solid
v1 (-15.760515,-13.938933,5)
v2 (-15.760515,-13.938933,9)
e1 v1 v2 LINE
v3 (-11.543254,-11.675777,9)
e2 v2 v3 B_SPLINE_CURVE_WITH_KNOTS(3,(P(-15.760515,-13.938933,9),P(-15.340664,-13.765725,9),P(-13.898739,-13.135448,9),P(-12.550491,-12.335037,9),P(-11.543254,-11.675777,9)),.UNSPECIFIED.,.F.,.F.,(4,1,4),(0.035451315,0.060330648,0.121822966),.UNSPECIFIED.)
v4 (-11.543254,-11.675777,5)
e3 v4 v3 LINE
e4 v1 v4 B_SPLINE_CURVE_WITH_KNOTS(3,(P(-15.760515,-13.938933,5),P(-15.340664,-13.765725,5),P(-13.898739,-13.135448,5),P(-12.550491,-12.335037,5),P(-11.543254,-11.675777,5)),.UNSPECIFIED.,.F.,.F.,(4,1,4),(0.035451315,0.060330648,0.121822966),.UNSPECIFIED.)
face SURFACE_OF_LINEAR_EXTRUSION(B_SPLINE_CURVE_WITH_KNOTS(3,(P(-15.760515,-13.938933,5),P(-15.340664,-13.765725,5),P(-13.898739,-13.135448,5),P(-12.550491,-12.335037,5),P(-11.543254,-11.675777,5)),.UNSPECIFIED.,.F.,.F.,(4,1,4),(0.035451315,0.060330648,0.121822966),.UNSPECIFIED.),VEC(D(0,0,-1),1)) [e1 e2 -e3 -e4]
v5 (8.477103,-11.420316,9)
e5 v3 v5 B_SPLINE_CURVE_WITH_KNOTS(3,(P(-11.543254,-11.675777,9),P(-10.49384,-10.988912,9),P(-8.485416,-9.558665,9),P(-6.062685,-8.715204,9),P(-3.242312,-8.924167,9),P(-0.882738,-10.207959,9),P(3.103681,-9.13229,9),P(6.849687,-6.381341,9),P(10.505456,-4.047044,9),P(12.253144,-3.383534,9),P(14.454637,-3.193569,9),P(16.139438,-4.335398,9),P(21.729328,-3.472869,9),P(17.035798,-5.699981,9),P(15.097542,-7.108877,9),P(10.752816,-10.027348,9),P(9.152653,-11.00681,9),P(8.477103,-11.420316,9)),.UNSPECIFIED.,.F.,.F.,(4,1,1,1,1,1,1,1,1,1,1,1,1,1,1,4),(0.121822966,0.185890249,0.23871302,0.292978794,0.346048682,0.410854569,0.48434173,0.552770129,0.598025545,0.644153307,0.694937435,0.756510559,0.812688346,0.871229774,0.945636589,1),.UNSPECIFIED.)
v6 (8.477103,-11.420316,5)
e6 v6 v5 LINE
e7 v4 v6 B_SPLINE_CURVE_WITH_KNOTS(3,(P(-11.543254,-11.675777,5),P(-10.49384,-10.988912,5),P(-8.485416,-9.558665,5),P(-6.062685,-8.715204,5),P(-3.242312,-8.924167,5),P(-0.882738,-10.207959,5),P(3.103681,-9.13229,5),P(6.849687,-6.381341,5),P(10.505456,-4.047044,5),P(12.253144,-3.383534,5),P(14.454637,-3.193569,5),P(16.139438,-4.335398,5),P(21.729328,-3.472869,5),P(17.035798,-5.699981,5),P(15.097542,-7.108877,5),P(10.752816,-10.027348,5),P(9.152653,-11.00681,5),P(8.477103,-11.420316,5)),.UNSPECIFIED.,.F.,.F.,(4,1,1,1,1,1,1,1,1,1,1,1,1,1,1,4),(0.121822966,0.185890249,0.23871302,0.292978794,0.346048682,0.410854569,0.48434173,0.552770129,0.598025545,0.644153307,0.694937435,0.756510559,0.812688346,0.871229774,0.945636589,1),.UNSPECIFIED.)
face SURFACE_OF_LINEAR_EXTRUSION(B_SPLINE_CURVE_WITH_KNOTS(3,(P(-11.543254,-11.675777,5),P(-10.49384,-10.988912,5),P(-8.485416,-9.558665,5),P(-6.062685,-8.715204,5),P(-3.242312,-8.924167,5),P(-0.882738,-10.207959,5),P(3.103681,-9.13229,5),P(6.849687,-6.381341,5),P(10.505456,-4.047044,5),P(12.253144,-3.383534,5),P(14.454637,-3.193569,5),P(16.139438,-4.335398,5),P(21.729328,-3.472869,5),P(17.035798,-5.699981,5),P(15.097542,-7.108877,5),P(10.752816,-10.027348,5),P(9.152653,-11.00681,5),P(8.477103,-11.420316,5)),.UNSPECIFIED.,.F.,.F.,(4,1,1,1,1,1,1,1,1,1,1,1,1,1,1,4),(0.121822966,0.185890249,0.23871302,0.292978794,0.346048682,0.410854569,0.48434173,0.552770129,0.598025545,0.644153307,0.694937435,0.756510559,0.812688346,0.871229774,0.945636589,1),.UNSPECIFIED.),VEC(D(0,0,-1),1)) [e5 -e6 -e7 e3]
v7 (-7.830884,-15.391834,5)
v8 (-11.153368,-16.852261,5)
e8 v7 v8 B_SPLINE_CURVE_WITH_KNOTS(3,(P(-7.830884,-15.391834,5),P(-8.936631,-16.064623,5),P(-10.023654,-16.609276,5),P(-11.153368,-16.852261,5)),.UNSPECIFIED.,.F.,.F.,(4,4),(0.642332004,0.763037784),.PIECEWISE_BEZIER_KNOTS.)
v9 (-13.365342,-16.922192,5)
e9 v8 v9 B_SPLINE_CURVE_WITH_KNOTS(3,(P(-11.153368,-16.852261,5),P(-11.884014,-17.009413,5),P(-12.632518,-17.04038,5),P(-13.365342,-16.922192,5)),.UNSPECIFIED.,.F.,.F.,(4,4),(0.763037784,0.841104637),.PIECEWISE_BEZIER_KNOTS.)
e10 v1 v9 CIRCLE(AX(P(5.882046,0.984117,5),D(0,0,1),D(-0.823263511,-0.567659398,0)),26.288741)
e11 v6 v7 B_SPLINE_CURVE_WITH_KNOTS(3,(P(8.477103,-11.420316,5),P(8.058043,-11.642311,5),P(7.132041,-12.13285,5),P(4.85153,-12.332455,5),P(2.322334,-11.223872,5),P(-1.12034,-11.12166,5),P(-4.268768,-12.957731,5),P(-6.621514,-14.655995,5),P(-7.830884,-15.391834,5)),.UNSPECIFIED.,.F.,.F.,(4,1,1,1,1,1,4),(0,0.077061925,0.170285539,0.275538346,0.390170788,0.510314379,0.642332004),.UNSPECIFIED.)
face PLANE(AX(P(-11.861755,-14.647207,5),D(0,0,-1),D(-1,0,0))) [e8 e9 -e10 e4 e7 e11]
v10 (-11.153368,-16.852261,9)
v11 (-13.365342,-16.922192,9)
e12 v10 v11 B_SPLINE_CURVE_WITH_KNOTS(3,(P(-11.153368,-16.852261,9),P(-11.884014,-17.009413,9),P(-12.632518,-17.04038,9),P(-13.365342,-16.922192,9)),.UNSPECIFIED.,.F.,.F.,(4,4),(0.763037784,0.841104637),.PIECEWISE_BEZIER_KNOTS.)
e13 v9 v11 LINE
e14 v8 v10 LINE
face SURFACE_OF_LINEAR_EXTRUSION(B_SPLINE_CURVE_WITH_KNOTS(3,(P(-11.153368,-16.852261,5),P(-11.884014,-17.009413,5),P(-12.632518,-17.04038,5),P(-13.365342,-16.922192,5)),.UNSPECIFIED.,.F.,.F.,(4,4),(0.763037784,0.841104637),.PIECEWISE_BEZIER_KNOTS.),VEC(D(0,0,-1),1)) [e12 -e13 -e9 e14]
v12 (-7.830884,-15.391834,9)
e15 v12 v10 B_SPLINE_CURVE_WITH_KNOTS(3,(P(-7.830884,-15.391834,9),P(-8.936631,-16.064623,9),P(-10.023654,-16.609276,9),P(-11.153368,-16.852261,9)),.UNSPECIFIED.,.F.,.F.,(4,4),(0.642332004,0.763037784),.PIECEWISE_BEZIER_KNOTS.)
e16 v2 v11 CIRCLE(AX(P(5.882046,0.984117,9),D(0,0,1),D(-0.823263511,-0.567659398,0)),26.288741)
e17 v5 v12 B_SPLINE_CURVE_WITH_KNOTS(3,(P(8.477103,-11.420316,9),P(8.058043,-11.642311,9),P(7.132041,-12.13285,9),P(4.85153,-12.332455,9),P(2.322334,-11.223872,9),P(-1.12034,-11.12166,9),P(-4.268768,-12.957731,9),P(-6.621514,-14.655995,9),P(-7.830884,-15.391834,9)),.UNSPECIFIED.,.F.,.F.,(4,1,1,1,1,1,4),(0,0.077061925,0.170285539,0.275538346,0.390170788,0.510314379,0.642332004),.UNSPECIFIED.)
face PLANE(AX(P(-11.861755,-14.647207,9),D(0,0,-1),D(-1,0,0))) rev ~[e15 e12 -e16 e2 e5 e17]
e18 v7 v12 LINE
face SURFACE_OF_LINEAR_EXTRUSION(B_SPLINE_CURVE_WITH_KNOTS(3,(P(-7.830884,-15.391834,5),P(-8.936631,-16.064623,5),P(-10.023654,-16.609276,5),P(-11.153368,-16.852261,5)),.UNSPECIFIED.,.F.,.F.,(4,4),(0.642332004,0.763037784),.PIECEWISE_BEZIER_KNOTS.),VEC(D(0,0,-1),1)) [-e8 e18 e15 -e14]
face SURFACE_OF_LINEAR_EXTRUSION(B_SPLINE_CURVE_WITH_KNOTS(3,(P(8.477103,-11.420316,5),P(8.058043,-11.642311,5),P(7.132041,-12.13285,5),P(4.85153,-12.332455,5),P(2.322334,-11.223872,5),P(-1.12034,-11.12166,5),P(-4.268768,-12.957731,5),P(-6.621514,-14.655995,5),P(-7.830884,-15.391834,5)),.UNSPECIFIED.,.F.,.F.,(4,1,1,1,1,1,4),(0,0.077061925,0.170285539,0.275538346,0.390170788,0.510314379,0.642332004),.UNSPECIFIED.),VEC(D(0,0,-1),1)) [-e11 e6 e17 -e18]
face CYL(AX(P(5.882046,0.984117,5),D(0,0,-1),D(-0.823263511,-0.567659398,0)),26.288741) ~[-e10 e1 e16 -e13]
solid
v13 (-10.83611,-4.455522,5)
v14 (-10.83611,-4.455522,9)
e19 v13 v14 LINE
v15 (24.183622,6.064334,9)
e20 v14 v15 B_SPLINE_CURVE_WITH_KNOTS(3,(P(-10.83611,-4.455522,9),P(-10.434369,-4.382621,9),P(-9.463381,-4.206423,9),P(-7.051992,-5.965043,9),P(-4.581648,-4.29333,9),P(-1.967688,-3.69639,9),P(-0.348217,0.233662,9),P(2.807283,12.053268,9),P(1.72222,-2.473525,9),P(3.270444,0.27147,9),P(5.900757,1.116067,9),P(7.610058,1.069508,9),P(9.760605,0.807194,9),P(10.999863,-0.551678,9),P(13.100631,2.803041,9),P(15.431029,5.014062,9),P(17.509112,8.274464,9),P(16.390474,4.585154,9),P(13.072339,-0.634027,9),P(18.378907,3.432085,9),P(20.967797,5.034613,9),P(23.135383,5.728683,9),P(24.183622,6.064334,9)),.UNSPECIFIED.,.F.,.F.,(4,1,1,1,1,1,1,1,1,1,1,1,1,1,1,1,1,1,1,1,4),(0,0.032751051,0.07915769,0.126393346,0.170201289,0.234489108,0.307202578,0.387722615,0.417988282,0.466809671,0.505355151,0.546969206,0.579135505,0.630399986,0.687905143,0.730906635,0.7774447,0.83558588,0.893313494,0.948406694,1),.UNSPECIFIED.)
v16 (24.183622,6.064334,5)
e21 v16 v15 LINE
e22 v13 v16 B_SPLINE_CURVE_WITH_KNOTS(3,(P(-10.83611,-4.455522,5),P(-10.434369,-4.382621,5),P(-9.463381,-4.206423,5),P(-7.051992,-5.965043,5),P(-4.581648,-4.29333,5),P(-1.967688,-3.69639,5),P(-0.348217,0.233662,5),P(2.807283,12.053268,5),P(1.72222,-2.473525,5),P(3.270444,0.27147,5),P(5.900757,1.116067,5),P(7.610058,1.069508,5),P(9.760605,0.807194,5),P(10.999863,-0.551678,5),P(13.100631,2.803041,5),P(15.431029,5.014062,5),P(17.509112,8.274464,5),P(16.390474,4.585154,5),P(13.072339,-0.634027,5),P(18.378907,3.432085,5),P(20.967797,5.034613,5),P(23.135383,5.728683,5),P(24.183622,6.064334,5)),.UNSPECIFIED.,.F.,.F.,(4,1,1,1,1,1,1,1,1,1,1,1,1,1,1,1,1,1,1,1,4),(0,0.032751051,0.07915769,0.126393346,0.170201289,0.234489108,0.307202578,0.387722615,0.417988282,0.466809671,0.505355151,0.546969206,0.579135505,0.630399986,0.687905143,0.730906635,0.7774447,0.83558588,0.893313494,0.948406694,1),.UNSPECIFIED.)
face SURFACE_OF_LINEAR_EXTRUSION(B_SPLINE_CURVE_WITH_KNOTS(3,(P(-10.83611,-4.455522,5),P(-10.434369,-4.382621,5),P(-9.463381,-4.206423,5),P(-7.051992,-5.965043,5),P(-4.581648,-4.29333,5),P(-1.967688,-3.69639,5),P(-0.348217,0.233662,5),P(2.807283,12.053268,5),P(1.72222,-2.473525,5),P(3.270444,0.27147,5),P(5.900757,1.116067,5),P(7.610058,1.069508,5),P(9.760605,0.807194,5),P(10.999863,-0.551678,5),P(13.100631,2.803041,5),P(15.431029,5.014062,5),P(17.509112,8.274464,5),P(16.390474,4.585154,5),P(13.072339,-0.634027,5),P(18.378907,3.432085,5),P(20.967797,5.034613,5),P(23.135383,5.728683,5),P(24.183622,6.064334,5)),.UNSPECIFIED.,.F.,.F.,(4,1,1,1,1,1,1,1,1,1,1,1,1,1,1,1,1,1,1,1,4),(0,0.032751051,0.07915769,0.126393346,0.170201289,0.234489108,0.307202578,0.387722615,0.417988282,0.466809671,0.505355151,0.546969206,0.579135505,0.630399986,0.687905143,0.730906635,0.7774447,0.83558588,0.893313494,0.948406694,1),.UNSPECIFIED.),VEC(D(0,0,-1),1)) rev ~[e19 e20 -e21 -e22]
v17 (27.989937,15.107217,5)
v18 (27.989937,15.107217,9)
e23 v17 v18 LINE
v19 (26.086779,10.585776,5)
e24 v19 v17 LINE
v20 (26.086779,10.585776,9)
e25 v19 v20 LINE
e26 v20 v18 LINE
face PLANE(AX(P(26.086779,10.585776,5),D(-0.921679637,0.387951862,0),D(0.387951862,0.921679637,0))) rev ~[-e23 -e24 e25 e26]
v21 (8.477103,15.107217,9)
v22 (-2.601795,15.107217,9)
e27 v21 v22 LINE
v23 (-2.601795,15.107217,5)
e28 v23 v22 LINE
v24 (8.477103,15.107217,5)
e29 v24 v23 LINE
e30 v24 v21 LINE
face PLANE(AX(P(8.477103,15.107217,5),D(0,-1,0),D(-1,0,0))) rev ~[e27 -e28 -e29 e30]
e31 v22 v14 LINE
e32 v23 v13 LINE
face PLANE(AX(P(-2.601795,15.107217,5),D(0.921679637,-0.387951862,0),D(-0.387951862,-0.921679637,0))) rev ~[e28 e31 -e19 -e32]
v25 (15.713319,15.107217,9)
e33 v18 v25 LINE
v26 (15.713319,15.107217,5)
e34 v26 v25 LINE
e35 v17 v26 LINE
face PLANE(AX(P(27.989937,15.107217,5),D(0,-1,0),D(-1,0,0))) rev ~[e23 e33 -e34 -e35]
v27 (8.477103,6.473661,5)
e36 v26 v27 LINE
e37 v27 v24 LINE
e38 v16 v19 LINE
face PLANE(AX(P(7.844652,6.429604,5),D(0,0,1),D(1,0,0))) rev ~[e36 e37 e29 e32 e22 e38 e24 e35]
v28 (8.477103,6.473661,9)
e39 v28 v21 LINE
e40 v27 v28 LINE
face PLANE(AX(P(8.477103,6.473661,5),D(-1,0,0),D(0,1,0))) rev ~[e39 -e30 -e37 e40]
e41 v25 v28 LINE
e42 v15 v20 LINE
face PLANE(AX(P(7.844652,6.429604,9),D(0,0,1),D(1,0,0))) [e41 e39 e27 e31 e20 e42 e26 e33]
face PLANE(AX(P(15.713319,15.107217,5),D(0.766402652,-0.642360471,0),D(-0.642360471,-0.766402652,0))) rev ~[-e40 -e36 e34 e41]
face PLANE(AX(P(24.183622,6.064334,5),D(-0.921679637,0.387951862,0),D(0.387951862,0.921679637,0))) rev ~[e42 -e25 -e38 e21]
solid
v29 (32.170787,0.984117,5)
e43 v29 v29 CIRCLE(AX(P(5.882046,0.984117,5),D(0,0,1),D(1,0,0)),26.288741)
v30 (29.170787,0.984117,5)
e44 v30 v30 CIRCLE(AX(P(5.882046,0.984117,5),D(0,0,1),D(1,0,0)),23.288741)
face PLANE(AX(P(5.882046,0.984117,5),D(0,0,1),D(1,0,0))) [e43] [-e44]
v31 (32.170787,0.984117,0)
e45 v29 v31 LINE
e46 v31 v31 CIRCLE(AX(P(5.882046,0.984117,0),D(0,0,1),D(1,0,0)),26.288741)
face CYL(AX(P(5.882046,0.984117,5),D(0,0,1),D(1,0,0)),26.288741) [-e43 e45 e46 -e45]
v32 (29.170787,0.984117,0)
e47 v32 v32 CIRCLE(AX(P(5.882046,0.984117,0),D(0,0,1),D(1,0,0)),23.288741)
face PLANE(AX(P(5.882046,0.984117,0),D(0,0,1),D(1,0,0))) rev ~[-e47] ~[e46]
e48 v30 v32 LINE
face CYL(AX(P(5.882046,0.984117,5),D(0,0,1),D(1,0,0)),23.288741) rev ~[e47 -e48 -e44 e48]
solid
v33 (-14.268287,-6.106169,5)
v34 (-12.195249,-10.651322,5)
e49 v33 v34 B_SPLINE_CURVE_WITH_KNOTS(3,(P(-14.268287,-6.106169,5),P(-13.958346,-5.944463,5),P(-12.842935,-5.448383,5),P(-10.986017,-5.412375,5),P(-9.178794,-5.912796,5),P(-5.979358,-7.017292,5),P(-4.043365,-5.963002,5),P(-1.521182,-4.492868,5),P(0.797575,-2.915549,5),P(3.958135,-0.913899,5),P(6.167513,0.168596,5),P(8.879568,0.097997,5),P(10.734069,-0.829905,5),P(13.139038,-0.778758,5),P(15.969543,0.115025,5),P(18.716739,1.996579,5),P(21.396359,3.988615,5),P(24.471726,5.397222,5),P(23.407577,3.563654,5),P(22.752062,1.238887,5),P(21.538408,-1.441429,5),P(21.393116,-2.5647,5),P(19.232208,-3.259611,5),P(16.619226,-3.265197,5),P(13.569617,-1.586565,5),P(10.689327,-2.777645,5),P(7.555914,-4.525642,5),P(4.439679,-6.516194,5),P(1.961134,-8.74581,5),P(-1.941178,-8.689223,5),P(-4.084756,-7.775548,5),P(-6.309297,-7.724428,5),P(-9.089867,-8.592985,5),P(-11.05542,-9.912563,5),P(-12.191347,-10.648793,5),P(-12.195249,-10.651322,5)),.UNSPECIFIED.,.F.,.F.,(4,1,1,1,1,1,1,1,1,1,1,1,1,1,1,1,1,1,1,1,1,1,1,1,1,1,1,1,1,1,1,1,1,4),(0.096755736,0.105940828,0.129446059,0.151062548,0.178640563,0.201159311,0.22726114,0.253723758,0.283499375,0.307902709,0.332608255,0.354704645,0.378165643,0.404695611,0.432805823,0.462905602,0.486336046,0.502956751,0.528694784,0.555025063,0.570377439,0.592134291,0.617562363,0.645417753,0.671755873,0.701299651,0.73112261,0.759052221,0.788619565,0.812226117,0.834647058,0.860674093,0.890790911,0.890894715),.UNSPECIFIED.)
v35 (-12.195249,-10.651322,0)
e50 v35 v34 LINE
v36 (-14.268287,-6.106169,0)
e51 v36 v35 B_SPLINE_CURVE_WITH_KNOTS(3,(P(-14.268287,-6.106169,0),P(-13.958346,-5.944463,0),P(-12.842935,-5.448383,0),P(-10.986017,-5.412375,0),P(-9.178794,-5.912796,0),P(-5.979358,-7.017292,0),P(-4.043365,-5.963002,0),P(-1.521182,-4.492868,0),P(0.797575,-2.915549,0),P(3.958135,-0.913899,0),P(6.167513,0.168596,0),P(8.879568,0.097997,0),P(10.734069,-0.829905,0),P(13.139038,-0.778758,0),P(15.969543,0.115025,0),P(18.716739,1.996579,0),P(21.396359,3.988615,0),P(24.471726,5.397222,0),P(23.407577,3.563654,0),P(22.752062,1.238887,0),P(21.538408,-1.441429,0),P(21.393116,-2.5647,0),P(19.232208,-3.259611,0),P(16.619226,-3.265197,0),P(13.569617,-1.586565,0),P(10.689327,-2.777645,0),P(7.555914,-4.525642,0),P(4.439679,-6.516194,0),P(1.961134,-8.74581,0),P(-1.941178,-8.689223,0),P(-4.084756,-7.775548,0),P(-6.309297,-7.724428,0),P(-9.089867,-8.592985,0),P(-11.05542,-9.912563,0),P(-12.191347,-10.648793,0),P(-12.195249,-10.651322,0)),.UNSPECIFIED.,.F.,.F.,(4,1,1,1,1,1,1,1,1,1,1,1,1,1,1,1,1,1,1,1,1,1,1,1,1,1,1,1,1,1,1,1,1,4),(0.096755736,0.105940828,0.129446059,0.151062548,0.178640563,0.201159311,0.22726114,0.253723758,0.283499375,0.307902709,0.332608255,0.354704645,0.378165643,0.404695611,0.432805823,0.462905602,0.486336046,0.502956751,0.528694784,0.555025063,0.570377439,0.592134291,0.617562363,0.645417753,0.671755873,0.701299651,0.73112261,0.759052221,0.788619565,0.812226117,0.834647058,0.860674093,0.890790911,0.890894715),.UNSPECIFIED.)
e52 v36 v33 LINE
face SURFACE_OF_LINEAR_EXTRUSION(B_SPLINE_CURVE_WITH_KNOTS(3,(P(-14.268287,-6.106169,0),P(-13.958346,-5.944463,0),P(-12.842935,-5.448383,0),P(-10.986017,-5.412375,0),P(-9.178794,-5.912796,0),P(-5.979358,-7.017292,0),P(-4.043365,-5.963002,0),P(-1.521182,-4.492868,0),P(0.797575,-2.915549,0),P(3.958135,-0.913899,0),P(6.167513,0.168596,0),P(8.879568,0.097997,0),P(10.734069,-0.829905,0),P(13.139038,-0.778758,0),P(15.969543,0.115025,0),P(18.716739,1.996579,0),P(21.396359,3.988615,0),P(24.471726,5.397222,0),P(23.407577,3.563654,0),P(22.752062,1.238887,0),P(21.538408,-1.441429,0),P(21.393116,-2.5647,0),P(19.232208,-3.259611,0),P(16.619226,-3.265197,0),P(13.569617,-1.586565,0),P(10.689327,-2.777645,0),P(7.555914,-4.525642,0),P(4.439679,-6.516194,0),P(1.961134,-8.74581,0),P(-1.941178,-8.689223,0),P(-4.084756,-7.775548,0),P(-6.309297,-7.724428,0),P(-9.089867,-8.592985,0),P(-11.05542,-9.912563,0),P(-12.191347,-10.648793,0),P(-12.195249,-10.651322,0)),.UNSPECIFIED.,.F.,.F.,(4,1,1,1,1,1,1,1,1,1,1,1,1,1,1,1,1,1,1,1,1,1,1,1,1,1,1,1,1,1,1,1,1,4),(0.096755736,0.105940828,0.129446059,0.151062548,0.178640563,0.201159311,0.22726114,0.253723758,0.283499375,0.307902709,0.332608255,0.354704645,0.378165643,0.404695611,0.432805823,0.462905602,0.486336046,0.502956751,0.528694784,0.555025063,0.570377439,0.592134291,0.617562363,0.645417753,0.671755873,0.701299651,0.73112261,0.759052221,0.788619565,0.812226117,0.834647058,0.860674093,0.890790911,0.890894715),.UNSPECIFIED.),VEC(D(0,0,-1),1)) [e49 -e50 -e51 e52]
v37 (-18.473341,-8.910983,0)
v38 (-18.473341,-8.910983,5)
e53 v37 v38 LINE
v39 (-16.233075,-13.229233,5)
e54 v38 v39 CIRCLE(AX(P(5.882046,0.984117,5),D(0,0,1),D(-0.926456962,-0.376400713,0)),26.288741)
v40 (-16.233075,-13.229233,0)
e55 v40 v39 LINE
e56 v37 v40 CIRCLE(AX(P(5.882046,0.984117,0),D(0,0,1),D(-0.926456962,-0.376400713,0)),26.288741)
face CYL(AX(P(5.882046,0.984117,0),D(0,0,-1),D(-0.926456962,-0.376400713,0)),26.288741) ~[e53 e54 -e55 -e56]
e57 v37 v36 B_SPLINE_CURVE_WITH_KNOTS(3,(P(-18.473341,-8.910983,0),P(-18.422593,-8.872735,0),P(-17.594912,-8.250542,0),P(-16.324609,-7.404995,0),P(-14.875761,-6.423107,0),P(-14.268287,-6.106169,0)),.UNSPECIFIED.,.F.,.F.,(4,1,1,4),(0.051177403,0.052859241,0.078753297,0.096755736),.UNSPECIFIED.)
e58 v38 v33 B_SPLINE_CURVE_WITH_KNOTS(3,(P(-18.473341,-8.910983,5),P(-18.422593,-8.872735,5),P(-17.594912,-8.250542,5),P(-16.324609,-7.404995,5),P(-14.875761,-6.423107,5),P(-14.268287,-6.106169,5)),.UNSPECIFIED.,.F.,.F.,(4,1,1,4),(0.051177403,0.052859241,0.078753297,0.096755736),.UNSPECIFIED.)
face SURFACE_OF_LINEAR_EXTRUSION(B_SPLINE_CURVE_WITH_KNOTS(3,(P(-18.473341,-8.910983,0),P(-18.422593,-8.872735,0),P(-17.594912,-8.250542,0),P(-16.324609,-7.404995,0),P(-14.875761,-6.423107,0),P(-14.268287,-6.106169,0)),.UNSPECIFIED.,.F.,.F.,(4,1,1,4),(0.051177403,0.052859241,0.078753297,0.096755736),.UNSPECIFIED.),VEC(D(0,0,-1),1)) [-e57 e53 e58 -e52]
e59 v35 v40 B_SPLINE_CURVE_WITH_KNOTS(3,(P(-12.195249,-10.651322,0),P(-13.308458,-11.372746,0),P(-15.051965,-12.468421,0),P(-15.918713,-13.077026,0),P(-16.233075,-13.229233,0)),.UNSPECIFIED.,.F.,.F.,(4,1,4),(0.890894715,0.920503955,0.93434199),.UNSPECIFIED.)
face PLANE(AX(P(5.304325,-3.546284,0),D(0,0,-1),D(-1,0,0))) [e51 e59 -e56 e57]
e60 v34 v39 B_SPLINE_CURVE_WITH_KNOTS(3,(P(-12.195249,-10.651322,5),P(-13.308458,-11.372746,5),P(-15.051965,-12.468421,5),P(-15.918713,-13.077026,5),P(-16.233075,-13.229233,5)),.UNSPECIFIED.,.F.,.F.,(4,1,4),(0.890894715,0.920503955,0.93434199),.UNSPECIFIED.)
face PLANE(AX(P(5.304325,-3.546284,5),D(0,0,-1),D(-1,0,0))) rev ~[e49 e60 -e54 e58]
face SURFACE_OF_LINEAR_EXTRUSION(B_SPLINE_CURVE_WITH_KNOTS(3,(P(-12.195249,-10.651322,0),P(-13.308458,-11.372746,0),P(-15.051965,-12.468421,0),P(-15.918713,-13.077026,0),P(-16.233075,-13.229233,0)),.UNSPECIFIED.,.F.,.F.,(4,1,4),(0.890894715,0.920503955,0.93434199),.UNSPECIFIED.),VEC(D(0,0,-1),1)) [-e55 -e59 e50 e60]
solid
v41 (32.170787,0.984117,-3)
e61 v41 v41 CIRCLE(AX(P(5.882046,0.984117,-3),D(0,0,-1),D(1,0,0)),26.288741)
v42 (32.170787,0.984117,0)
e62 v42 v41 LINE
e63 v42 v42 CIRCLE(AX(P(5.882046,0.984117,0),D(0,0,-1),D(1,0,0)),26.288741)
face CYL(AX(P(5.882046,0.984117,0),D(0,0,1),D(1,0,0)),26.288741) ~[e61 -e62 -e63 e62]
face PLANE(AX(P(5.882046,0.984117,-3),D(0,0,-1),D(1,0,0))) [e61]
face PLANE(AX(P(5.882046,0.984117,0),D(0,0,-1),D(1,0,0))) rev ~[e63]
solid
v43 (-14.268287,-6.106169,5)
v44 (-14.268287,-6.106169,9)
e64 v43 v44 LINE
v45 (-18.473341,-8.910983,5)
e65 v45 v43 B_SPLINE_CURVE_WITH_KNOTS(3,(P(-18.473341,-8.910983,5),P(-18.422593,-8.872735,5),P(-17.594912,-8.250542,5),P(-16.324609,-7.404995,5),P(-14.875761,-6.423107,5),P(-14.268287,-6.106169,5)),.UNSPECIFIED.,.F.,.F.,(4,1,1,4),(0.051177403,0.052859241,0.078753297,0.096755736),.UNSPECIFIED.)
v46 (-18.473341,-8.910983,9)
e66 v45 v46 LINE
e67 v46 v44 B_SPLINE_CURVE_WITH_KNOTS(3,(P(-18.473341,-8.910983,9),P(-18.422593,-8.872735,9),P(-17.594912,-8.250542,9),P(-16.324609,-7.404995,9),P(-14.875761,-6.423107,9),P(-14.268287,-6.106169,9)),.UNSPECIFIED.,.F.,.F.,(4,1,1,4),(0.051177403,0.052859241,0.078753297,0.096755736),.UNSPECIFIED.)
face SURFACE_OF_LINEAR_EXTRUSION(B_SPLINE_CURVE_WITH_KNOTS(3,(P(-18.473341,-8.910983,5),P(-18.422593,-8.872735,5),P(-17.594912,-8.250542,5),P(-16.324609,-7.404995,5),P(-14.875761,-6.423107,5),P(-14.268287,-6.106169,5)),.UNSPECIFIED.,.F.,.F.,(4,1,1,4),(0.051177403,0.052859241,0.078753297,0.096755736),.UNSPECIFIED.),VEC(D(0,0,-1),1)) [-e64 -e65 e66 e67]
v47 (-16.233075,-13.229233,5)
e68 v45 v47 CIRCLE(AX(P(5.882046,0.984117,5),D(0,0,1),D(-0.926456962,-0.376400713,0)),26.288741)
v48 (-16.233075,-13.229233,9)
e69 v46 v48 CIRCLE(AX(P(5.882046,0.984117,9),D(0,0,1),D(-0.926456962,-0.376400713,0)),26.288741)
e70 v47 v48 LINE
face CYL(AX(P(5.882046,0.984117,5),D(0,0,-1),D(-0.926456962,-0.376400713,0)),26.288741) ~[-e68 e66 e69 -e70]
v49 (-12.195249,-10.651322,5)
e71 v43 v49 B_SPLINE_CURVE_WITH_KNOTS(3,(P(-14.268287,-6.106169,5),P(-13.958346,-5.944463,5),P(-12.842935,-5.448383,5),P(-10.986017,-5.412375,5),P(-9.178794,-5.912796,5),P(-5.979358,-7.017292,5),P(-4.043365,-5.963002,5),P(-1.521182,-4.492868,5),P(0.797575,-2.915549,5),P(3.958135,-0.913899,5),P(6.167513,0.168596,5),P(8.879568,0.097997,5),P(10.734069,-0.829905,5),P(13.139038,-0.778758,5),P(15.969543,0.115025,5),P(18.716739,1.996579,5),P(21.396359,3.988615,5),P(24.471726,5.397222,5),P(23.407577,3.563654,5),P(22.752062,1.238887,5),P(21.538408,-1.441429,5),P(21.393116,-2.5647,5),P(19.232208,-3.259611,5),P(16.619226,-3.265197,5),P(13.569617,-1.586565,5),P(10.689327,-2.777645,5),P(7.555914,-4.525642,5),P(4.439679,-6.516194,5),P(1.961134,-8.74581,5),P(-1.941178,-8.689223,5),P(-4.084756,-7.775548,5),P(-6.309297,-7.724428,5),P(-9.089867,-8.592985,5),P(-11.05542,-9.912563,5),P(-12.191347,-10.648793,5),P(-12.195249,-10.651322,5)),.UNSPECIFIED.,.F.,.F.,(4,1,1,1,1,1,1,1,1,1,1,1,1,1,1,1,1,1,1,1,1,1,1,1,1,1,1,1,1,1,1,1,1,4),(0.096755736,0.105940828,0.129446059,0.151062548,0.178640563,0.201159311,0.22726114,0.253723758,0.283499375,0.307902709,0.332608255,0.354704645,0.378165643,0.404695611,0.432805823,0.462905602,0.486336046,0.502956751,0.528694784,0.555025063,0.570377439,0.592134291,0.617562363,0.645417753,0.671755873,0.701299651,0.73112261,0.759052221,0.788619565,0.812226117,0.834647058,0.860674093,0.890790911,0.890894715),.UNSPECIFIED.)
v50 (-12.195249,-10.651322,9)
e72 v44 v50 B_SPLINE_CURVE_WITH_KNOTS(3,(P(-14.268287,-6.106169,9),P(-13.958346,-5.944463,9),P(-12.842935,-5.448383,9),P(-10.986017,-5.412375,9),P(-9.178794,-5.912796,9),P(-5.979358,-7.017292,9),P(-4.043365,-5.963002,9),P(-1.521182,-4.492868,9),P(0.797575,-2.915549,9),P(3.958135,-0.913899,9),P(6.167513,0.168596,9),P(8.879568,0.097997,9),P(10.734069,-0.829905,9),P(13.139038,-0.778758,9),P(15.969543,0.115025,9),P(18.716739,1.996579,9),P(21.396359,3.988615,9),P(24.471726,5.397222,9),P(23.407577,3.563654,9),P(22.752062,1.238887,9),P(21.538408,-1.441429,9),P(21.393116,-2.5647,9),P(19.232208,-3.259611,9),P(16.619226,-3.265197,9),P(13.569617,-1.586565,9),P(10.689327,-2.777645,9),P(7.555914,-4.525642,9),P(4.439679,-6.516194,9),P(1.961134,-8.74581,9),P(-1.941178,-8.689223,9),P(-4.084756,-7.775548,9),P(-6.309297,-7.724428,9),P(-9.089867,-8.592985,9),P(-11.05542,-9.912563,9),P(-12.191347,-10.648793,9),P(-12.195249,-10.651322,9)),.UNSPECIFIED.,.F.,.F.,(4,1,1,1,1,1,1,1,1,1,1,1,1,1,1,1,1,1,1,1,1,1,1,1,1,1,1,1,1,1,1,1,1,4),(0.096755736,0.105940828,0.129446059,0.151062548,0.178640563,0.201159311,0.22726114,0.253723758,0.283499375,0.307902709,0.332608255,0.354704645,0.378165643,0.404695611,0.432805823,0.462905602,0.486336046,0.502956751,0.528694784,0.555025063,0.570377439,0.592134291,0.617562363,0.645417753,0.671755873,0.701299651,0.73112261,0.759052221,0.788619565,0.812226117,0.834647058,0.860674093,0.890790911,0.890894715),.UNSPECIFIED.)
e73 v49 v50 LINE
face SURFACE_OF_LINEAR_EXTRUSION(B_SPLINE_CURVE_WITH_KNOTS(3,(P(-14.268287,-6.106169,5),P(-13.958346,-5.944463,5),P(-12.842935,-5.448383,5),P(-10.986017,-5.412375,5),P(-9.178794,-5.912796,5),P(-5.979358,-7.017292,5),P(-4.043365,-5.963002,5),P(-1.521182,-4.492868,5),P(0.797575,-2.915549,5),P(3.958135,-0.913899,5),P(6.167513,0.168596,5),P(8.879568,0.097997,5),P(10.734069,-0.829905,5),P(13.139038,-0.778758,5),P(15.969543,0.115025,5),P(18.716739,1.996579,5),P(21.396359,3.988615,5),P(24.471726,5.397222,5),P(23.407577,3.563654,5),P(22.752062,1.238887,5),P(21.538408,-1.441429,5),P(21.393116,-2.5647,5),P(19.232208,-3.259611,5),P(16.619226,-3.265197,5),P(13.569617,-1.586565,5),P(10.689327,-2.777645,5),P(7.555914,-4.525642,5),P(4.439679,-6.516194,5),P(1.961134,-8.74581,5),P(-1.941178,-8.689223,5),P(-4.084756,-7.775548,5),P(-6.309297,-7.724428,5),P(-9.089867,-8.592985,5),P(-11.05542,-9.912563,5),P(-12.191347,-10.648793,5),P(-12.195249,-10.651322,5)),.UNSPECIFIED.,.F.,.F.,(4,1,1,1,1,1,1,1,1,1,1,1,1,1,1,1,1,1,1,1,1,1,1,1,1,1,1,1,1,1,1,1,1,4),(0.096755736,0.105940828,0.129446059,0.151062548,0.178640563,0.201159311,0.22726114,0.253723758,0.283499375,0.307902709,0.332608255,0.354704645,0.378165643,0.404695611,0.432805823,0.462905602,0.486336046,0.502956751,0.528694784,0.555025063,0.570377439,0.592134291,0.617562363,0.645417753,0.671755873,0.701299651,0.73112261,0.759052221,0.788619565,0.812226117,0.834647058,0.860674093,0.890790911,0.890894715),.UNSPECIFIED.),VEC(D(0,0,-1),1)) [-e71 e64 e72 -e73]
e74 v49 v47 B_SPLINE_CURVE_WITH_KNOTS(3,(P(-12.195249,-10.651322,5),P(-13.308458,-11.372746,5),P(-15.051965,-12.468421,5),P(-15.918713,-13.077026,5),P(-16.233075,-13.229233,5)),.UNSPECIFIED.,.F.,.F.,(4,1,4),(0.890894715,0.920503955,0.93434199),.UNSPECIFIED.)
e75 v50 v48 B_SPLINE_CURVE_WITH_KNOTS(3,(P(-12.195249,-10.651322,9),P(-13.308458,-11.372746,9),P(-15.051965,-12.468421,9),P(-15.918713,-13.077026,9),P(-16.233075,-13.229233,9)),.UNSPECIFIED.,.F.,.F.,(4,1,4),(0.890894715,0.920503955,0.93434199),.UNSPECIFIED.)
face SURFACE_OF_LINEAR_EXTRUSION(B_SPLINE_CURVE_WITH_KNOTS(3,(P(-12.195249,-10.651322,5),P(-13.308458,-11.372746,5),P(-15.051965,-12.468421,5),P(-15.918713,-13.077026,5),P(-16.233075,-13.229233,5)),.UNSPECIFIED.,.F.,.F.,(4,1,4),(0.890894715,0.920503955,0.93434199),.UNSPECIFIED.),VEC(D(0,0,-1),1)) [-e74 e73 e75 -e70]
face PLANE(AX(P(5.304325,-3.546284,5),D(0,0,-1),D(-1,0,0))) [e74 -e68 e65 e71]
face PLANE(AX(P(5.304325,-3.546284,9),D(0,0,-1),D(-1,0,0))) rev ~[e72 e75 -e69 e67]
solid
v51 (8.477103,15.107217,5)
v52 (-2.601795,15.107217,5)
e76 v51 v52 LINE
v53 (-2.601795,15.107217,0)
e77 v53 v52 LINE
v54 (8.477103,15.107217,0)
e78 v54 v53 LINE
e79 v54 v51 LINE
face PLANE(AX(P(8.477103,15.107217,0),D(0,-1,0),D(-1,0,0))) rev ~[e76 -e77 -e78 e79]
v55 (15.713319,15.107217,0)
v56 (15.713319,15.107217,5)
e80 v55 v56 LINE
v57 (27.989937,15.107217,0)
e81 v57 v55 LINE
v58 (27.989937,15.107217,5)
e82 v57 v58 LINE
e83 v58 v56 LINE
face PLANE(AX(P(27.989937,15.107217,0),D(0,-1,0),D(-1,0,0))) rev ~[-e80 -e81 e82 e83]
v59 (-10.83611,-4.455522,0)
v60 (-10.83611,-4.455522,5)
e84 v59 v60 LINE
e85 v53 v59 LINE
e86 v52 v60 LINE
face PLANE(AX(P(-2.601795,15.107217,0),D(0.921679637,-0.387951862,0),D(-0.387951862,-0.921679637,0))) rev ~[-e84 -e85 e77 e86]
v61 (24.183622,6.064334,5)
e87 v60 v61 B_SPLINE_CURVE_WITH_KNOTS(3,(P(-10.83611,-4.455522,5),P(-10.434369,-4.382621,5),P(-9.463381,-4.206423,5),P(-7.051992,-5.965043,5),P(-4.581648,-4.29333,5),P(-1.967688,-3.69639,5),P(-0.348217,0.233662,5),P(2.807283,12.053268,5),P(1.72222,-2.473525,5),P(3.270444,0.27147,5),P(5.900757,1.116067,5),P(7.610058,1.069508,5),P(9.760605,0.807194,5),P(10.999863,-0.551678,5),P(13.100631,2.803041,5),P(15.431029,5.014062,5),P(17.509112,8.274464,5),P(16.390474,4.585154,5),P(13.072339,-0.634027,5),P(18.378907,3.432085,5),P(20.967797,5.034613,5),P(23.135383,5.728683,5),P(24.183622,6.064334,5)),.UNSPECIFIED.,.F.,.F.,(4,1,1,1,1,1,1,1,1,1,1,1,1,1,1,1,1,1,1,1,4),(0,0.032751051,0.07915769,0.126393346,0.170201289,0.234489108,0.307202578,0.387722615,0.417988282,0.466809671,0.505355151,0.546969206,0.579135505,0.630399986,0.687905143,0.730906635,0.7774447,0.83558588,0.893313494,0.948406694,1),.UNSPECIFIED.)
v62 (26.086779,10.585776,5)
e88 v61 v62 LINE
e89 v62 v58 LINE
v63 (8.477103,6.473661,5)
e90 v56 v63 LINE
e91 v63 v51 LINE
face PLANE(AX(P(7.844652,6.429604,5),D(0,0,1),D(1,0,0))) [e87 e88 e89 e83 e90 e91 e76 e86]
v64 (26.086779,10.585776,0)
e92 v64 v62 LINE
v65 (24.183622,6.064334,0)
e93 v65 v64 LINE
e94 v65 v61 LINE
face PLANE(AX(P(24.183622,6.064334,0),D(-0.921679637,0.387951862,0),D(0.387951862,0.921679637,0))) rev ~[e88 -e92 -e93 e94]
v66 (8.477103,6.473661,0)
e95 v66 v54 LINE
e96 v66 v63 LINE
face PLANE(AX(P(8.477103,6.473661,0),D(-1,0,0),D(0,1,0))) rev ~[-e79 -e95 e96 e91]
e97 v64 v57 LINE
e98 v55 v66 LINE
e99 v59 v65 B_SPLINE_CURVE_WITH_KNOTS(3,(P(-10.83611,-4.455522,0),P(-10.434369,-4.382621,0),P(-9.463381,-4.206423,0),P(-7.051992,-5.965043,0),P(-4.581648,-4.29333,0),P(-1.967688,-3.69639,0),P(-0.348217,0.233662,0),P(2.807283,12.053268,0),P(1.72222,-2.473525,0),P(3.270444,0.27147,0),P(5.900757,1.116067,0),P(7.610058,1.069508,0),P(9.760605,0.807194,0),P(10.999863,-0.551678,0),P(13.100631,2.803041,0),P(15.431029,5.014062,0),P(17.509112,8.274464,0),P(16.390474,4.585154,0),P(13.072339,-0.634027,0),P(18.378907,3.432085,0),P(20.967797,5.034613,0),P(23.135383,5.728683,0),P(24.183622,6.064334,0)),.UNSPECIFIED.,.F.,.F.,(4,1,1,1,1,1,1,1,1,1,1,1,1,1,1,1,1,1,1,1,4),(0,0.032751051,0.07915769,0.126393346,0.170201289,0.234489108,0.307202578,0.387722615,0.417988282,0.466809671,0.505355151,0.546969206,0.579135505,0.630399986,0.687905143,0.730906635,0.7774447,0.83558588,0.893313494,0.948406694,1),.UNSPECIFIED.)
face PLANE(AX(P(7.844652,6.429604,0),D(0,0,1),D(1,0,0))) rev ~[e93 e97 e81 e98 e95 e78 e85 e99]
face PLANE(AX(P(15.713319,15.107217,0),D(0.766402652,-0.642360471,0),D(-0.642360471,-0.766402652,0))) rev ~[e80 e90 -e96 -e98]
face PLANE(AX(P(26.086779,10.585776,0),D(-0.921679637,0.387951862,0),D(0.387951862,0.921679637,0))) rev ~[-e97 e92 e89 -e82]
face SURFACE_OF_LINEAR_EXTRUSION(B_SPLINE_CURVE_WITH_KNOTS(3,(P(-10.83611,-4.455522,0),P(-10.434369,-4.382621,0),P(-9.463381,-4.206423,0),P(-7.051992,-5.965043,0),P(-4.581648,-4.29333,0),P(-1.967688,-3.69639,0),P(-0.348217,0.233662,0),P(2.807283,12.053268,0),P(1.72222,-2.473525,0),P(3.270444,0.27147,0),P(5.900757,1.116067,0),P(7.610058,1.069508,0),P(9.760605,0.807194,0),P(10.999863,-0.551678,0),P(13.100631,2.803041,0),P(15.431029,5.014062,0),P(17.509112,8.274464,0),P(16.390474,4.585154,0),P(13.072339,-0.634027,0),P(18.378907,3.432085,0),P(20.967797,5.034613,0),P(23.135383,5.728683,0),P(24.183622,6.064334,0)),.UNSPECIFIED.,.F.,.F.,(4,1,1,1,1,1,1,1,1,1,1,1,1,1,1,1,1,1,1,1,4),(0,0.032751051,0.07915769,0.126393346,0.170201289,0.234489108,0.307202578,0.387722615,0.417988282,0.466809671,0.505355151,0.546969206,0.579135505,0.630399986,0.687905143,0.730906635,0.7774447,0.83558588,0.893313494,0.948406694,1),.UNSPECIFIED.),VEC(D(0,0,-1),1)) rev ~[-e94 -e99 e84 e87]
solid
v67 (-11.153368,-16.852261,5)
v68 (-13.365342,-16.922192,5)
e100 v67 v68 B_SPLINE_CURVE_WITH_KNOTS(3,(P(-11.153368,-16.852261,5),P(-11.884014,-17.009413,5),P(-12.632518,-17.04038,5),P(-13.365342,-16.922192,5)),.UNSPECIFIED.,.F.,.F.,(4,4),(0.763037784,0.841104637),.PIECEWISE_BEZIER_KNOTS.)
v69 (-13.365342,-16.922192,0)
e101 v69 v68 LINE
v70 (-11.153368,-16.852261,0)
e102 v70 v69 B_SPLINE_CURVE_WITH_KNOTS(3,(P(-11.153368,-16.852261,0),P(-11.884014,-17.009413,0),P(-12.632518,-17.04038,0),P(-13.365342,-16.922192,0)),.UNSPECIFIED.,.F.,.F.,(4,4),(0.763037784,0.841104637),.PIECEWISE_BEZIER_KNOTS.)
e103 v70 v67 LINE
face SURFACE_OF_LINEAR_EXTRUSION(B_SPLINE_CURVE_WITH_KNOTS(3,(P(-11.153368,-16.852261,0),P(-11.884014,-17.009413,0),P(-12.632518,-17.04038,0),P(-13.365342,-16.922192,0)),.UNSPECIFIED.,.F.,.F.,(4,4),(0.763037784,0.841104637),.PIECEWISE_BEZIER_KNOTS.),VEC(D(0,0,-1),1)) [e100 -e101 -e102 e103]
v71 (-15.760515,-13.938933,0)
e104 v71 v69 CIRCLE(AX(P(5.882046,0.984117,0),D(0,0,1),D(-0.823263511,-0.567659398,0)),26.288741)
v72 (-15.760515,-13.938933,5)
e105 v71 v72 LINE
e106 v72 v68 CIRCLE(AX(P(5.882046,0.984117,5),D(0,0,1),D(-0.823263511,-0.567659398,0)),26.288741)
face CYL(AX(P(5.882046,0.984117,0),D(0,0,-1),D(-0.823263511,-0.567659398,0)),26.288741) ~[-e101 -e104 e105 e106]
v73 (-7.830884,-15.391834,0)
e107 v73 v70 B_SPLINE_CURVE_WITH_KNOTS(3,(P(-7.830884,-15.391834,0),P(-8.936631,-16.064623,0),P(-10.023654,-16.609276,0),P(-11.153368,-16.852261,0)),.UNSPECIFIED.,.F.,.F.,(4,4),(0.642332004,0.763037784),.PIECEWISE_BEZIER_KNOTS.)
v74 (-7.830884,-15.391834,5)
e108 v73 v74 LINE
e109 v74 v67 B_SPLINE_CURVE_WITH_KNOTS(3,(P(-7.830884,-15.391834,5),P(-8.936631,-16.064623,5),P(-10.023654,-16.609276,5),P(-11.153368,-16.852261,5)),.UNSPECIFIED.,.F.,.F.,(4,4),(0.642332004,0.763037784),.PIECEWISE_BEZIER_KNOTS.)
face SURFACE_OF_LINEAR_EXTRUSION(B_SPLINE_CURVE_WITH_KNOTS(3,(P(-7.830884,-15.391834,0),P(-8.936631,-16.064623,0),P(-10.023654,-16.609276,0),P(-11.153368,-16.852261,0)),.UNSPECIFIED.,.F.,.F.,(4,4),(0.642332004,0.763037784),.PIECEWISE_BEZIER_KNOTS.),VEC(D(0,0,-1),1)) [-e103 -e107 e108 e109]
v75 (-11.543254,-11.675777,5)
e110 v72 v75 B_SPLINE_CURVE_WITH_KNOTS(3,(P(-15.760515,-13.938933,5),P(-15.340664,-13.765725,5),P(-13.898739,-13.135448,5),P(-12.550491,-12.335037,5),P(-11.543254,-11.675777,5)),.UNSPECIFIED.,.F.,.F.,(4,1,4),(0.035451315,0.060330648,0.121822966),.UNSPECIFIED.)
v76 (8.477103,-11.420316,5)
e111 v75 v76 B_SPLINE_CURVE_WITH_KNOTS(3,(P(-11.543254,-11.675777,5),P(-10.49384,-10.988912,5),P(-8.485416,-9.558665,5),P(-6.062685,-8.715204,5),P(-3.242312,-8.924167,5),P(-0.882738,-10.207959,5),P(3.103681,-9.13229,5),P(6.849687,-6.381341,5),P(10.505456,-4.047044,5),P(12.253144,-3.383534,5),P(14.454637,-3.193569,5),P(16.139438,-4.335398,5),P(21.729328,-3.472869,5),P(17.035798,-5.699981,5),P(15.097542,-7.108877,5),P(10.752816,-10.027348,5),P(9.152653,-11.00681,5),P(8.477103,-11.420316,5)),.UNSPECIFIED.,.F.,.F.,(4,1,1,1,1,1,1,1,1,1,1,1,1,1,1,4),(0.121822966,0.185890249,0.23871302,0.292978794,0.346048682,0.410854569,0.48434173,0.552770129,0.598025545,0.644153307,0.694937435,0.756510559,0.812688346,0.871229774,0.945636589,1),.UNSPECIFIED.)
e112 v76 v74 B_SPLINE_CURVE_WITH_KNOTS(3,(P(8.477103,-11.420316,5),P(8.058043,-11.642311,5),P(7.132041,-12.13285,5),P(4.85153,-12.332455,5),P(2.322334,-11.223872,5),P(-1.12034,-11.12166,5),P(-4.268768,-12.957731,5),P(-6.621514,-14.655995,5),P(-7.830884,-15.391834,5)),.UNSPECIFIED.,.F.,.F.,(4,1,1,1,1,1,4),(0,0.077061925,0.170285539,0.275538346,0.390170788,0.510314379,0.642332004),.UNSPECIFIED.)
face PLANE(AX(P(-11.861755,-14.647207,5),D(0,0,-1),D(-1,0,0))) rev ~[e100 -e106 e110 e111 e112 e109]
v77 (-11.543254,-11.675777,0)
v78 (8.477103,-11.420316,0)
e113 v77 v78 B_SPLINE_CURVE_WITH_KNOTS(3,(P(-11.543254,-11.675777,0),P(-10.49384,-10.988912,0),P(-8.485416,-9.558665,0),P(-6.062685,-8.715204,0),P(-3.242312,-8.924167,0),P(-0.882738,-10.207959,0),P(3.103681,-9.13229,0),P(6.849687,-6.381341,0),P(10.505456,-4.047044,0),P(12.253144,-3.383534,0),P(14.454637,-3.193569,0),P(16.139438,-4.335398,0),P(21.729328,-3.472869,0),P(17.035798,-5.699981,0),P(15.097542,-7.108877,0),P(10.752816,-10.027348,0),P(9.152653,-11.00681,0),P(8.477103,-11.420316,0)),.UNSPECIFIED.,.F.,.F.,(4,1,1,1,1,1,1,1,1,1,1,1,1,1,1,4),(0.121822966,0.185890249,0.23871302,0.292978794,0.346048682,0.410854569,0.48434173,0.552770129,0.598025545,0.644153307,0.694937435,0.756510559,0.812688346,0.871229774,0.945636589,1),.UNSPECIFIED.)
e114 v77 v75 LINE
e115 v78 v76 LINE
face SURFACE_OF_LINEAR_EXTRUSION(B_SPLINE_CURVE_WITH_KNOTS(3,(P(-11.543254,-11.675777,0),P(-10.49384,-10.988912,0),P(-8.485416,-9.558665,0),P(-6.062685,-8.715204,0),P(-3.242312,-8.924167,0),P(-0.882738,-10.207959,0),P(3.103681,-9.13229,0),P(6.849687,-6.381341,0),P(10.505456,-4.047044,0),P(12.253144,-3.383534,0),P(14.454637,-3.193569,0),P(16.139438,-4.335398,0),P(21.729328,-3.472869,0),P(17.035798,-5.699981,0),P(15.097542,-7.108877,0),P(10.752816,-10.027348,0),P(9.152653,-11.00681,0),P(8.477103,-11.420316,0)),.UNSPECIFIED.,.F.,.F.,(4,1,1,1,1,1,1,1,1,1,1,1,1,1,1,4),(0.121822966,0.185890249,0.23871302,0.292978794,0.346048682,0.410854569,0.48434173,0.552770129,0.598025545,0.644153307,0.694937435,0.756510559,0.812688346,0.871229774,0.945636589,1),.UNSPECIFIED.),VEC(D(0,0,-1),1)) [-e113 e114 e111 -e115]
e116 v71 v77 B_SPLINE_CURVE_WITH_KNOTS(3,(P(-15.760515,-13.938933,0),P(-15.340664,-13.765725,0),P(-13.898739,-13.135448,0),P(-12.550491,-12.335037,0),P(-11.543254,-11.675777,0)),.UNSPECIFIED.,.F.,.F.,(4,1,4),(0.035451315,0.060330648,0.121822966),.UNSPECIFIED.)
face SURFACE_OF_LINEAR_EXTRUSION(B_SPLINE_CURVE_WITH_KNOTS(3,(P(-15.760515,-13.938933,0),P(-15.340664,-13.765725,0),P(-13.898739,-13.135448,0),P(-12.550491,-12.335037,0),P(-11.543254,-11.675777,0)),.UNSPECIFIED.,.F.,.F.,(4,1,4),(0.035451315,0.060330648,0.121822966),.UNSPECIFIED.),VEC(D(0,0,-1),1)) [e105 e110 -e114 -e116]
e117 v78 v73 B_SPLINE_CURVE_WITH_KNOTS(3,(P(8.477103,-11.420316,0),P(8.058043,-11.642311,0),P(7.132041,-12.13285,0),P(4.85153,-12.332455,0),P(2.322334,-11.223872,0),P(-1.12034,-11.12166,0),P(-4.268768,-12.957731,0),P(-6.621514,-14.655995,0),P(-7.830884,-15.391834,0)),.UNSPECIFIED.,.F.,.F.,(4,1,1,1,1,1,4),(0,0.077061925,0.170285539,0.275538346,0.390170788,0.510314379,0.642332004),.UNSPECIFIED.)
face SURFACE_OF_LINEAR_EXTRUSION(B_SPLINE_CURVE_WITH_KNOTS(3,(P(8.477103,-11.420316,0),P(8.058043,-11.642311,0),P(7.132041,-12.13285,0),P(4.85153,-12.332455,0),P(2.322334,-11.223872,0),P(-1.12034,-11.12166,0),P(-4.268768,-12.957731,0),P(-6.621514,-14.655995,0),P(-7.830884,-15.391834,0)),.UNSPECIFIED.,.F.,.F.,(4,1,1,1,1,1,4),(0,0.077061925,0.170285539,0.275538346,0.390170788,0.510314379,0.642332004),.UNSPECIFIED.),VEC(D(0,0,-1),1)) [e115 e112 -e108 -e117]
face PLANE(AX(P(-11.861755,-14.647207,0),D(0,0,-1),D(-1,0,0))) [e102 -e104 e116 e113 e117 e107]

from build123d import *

# Parameters (mm, degrees)
F1_DEPTH = 5
F3_R     = 26.2887406731
F4_DEPTH = 3
F5_R     = 26.2887406731
F5_R_2   = 23.2887406731
F6_DEPTH = 5
F7_DEPTH = 4


# Not quite as in the source:
# - the program builds the solid bodies; features that only make, move or delete a surface that nothing else refers to are left out


with BuildPart() as f1:
    # F0 (on Top) → F1 (new body)
    with BuildSketch(Plane.XY):
        with BuildLine():
            Line((23.7963441759, 15.1072172448), (19.2888453603, 15.1072172448))
            Line((19.2888453603, 15.1072172448), (15.7133191824, 15.1072172448))
            Line((15.7133191824, 15.1072172448), (8.4771029651, 6.4736609347))
            Line((8.4771029651, 6.4736609347), (8.4771029651, 15.1072172448))
            Line((8.4771029651, 15.1072172448), (-2.6017946657, 15.1072172448))
            Line((-2.6017946657, 15.1072172448), (-10.8361104503, -4.4555221684))
            add(Edge.make_bspline(
                [(-10.8361104503, -4.4555221684), (-10.4343693569, -4.3826211181), (-9.4633807702, -4.2064228428), (-7.0519921591, -5.9650430703), (-4.5816475592, -4.2933295263), (-1.9676882693, -3.6963901633), (-0.348217337, 0.2336616175), (2.8072826499, 12.0532678023), (1.722219715, -2.4735248895), (3.2704441394, 0.2714703564), (5.9007571837, 1.1160671049), (7.6100584737, 1.0695083777), (9.7606046095, 0.80719369), (10.9998631376, -0.5516776232), (13.1006310402, 2.8030409274), (15.4310289621, 5.0140619141), (17.5091121303, 8.2744638424), (16.3904741823, 4.5851540219), (13.0723392276, -0.6340270806), (18.3789070792, 3.4320853925), (20.9677968345, 5.0346125934), (23.1353828408, 5.7286832434), (24.1836215662, 6.0643339311)],
                knots=[0, 0, 0, 0, 0.0327510511, 0.0791576898, 0.1263933458, 0.1702012891, 0.2344891078, 0.3072025778, 0.3877226152, 0.4179882815, 0.4668096706, 0.505355151, 0.5469692057, 0.5791355047, 0.6303999864, 0.6879051425, 0.7309066345, 0.7774447, 0.8355858799, 0.8933134939, 0.9484066944, 1, 1, 1, 1], degree=3))
            Line((24.1836215662, 6.0643339311), (26.0867792794, 10.5857755879))
            Line((26.0867792794, 10.5857755879), (27.9899369925, 15.1072172448))
            Line((27.9899369925, 15.1072172448), (23.7963441759, 15.1072172448))
        make_face()
    extrude(amount=F1_DEPTH)


with BuildPart() as f1b:
    # F0 (on Top) → F1, piece 2 (new body)
    with BuildSketch(Plane.XY):
        with BuildLine():
            add(Edge.make_bspline(
                [(-14.2682872836, -6.1061690629), (-13.9583456939, -5.944462994), (-12.8429352258, -5.448382868), (-10.9860167046, -5.412374749), (-9.1787939742, -5.9127964853), (-5.9793578204, -7.0172917936), (-4.0433647011, -5.9630021206), (-1.5211815589, -4.4928677724), (0.7975745464, -2.9155490623), (3.9581349912, -0.9138991304), (6.1675128346, 0.1685962635), (8.8795683569, 0.0979966698), (10.7340686313, -0.8299048946), (13.1390384474, -0.7787582686), (15.9695425229, 0.1150245467), (18.7167386382, 1.9965785265), (21.3963592711, 3.9886145718), (24.4717261058, 5.3972223641), (23.407577476, 3.5636539698), (22.7520616494, 1.238886965), (21.5384075596, -1.4414293553), (21.3931156013, -2.5647004359), (19.2322081343, -3.25961114), (16.6192257522, -3.2651965894), (13.5696174174, -1.586565479), (10.6893269067, -2.777644785), (7.5559143837, -4.5256417888), (4.4396788093, -6.5161939366), (1.9611343286, -8.7458099538), (-1.9411777654, -8.6892226306), (-4.0847560172, -7.7755478782), (-6.3092965475, -7.7244280444), (-9.0898670503, -8.5929852237), (-11.0554204683, -9.9125631023), (-12.1913468016, -10.6487929135), (-12.1952494823, -10.6513220777)],
                knots=[0.0967557357, 0.0967557357, 0.0967557357, 0.0967557357, 0.1059408277, 0.1294460595, 0.1510625476, 0.1786405627, 0.2011593113, 0.2272611402, 0.253723758, 0.2834993747, 0.3079027085, 0.332608255, 0.3547046452, 0.378165643, 0.4046956115, 0.4328058229, 0.4629056021, 0.4863360462, 0.5029567511, 0.5286947841, 0.5550250628, 0.5703774393, 0.5921342915, 0.6175623632, 0.6454177535, 0.671755873, 0.7012996512, 0.7311226102, 0.7590522215, 0.7886195648, 0.8122261167, 0.8346470578, 0.8606740928, 0.8907909111, 0.890894715, 0.890894715, 0.890894715, 0.890894715], degree=3))
            add(Edge.make_bspline(
                [(-14.2682872836, -6.1061690629), (-13.763419632, -7.5022555749), (-13.0535168829, -9.1852694628), (-12.1952494823, -10.6513220777)],
                knots=[0.4139602767, 0.4139602767, 0.4139602767, 0.4139602767, 0.4587948897, 0.4587948897, 0.4587948897, 0.4587948897], degree=3))
        make_face()
        with BuildLine():
            add(Edge.make_bspline(
                [(-18.4733406444, -8.9109834623), (-18.4225927781, -8.8727345044), (-17.5949119208, -8.2505417581), (-16.3246093096, -7.4049949505), (-14.8757612608, -6.4231069379), (-14.2682872836, -6.1061690629)],
                knots=[0.0511774027, 0.0511774027, 0.0511774027, 0.0511774027, 0.0528592406, 0.0787532973, 0.0967557357, 0.0967557357, 0.0967557357, 0.0967557357], degree=3))
            ThreePointArc((-18.4733406444, -8.9109834623), (-17.4533098383, -11.1220400627), (-16.233074702, -13.2292325901))
            add(Edge.make_bspline(
                [(-12.1952494823, -10.6513220777), (-13.3084581911, -11.372746103), (-15.0519652777, -12.4684214036), (-15.9187131878, -13.0770255012), (-16.233074702, -13.2292325901)],
                knots=[0.890894715, 0.890894715, 0.890894715, 0.890894715, 0.9205039546, 0.9343419902, 0.9343419902, 0.9343419902, 0.9343419902], degree=3))
            add(Edge.make_bspline(
                [(-14.2682872836, -6.1061690629), (-13.763419632, -7.5022555749), (-13.0535168829, -9.1852694628), (-12.1952494823, -10.6513220777)],
                knots=[0.4139602767, 0.4139602767, 0.4139602767, 0.4139602767, 0.4587948897, 0.4587948897, 0.4587948897, 0.4587948897], degree=3))
        make_face()
    extrude(amount=F1_DEPTH)


with BuildPart() as f1c:
    # F0 (on Top) → F1, piece 3 (new body)
    with BuildSketch(Plane.XY):
        with BuildLine():
            add(Edge.make_bspline(
                [(-15.7605147548, -13.9389334253), (-15.3406636143, -13.7657247702), (-13.8987388774, -13.1354481012), (-12.5504908967, -12.3350365424), (-11.543254048, -11.6757772259)],
                knots=[0.0354513148, 0.0354513148, 0.0354513148, 0.0354513148, 0.0603306484, 0.1218229664, 0.1218229664, 0.1218229664, 0.1218229664], degree=3))
            ThreePointArc((-15.7605147548, -13.9389334253), (-14.6172697034, -15.4741917012), (-13.3653424335, -16.9221921612))
            add(Edge.make_bspline(
                [(-11.1533682793, -16.8522614986), (-11.8840144876, -17.0094130762), (-12.6325177474, -17.0403801326), (-13.3653424335, -16.9221921612)],
                knots=[0.7630377841, 0.7630377841, 0.7630377841, 0.7630377841, 0.8411046366, 0.8411046366, 0.8411046366, 0.8411046366], degree=3))
            add(Edge.make_bspline(
                [(-7.8308843323, -15.3918337734), (-8.9366307934, -16.0646229924), (-10.0236542222, -16.6092761189), (-11.1533682793, -16.8522614986)],
                knots=[0.6423320039, 0.6423320039, 0.6423320039, 0.6423320039, 0.7630377841, 0.7630377841, 0.7630377841, 0.7630377841], degree=3))
            add(Edge.make_bspline(
                [(-11.5432540569, -11.675777213), (-10.5062143739, -13.1668444028), (-9.2924766715, -14.2922474657), (-7.8308843323, -15.3918337734)],
                knots=[0.4697029588, 0.4697029588, 0.4697029588, 0.4697029588, 0.5198308803, 0.5198308803, 0.5198308803, 0.5198308803], degree=3))
        make_face()
        with BuildLine():
            add(Edge.make_bspline(
                [(-11.543254048, -11.6757772259), (-10.4938395857, -10.9889117067), (-8.4854155983, -9.5586653969), (-6.0626847181, -8.7152044134), (-3.2423122223, -8.9241669329), (-0.8827377625, -10.2079591044), (3.103680717, -9.1322896947), (6.8496872557, -6.3813414206), (10.5054561575, -4.0470436384), (12.2531442064, -3.3835340931), (14.4546368111, -3.1935687837), (16.1394384372, -4.335398428), (21.7293278697, -3.4728690921), (17.0357980083, -5.6999809216), (15.0975423786, -7.1088768473), (10.7528156625, -10.0273475201), (9.1526531106, -11.0068103937), (8.4771029651, -11.4203160629)],
                knots=[0.1218229664, 0.1218229664, 0.1218229664, 0.1218229664, 0.1858902489, 0.2387130203, 0.292978794, 0.3460486821, 0.4108545688, 0.4843417303, 0.5527701287, 0.5980255452, 0.6441533068, 0.6949374354, 0.7565105586, 0.8126883461, 0.8712297744, 0.9456365894, 1, 1, 1, 1], degree=3))
            add(Edge.make_bspline(
                [(-11.5432540569, -11.675777213), (-10.5062143739, -13.1668444028), (-9.2924766715, -14.2922474657), (-7.8308843323, -15.3918337734)],
                knots=[0.4697029588, 0.4697029588, 0.4697029588, 0.4697029588, 0.5198308803, 0.5198308803, 0.5198308803, 0.5198308803], degree=3))
            add(Edge.make_bspline(
                [(8.4771029651, -11.4203160629), (8.0580429463, -11.6423110517), (7.1320411504, -12.1328504444), (4.8515297092, -12.3324551861), (2.3223342989, -11.2238723354), (-1.1203404944, -11.12165998), (-4.2687677404, -12.9577305352), (-6.6215137336, -14.6559946554), (-7.8308843323, -15.3918337734)],
                knots=[0, 0, 0, 0, 0.0770619252, 0.1702855388, 0.275538346, 0.3901707876, 0.5103143789, 0.6423320039, 0.6423320039, 0.6423320039, 0.6423320039], degree=3))
        make_face()
    extrude(amount=F1_DEPTH)


with BuildPart() as f4:
    # F3 (on face) → F4 (new body)
    with BuildSketch(Plane(origin=(0, 0, 0), x_dir=(1, 0, 0), z_dir=(0, 0, -1))):
        with Locations((5.8820461854, -0.9841172723)):
            Circle(F3_R)
    extrude(amount=F4_DEPTH)


with BuildPart() as f6:
    # F5 (on face) → F6 (new body, through all)
    with BuildSketch(Plane.XY.offset(5)):
        with Locations((5.8820461854, 0.9841172723)):
            Circle(F5_R)
        with Locations((5.8820461854, 0.9841172723)):
            Circle(F5_R_2, mode=Mode.SUBTRACT)
    extrude(amount=-F6_DEPTH)


with BuildPart() as f7:
    # F7 (new): a face of the model
    f7_faces = [f1.part.faces().sort_by_distance(p)[0] for p in [
        (7.382294917, 7.0109600974, 5),
    ]]
    extrude(f7_faces, amount=F7_DEPTH)


with BuildPart() as f7b:
    # F7#2 (new): a face of the model
    f7_2_faces = [f1b.part.faces().sort_by_distance(p)[0] for p in [
        (2.5605354423, -4.4747167723, 5),
    ]]
    extrude(f7_2_faces, amount=F7_DEPTH)


with BuildPart() as f7c:
    # F7#3 (new): a face of the model
    f7_3_faces = [f1c.part.faces().sort_by_distance(p)[0] for p in [
        (1.331537316, -10.0293950589, 5),
    ]]
    extrude(f7_3_faces, amount=F7_DEPTH)


solid = Compound([f1.part, f1b.part, f1c.part, f4.part, f6.part, f7.part, f7b.part, f7c.part])
